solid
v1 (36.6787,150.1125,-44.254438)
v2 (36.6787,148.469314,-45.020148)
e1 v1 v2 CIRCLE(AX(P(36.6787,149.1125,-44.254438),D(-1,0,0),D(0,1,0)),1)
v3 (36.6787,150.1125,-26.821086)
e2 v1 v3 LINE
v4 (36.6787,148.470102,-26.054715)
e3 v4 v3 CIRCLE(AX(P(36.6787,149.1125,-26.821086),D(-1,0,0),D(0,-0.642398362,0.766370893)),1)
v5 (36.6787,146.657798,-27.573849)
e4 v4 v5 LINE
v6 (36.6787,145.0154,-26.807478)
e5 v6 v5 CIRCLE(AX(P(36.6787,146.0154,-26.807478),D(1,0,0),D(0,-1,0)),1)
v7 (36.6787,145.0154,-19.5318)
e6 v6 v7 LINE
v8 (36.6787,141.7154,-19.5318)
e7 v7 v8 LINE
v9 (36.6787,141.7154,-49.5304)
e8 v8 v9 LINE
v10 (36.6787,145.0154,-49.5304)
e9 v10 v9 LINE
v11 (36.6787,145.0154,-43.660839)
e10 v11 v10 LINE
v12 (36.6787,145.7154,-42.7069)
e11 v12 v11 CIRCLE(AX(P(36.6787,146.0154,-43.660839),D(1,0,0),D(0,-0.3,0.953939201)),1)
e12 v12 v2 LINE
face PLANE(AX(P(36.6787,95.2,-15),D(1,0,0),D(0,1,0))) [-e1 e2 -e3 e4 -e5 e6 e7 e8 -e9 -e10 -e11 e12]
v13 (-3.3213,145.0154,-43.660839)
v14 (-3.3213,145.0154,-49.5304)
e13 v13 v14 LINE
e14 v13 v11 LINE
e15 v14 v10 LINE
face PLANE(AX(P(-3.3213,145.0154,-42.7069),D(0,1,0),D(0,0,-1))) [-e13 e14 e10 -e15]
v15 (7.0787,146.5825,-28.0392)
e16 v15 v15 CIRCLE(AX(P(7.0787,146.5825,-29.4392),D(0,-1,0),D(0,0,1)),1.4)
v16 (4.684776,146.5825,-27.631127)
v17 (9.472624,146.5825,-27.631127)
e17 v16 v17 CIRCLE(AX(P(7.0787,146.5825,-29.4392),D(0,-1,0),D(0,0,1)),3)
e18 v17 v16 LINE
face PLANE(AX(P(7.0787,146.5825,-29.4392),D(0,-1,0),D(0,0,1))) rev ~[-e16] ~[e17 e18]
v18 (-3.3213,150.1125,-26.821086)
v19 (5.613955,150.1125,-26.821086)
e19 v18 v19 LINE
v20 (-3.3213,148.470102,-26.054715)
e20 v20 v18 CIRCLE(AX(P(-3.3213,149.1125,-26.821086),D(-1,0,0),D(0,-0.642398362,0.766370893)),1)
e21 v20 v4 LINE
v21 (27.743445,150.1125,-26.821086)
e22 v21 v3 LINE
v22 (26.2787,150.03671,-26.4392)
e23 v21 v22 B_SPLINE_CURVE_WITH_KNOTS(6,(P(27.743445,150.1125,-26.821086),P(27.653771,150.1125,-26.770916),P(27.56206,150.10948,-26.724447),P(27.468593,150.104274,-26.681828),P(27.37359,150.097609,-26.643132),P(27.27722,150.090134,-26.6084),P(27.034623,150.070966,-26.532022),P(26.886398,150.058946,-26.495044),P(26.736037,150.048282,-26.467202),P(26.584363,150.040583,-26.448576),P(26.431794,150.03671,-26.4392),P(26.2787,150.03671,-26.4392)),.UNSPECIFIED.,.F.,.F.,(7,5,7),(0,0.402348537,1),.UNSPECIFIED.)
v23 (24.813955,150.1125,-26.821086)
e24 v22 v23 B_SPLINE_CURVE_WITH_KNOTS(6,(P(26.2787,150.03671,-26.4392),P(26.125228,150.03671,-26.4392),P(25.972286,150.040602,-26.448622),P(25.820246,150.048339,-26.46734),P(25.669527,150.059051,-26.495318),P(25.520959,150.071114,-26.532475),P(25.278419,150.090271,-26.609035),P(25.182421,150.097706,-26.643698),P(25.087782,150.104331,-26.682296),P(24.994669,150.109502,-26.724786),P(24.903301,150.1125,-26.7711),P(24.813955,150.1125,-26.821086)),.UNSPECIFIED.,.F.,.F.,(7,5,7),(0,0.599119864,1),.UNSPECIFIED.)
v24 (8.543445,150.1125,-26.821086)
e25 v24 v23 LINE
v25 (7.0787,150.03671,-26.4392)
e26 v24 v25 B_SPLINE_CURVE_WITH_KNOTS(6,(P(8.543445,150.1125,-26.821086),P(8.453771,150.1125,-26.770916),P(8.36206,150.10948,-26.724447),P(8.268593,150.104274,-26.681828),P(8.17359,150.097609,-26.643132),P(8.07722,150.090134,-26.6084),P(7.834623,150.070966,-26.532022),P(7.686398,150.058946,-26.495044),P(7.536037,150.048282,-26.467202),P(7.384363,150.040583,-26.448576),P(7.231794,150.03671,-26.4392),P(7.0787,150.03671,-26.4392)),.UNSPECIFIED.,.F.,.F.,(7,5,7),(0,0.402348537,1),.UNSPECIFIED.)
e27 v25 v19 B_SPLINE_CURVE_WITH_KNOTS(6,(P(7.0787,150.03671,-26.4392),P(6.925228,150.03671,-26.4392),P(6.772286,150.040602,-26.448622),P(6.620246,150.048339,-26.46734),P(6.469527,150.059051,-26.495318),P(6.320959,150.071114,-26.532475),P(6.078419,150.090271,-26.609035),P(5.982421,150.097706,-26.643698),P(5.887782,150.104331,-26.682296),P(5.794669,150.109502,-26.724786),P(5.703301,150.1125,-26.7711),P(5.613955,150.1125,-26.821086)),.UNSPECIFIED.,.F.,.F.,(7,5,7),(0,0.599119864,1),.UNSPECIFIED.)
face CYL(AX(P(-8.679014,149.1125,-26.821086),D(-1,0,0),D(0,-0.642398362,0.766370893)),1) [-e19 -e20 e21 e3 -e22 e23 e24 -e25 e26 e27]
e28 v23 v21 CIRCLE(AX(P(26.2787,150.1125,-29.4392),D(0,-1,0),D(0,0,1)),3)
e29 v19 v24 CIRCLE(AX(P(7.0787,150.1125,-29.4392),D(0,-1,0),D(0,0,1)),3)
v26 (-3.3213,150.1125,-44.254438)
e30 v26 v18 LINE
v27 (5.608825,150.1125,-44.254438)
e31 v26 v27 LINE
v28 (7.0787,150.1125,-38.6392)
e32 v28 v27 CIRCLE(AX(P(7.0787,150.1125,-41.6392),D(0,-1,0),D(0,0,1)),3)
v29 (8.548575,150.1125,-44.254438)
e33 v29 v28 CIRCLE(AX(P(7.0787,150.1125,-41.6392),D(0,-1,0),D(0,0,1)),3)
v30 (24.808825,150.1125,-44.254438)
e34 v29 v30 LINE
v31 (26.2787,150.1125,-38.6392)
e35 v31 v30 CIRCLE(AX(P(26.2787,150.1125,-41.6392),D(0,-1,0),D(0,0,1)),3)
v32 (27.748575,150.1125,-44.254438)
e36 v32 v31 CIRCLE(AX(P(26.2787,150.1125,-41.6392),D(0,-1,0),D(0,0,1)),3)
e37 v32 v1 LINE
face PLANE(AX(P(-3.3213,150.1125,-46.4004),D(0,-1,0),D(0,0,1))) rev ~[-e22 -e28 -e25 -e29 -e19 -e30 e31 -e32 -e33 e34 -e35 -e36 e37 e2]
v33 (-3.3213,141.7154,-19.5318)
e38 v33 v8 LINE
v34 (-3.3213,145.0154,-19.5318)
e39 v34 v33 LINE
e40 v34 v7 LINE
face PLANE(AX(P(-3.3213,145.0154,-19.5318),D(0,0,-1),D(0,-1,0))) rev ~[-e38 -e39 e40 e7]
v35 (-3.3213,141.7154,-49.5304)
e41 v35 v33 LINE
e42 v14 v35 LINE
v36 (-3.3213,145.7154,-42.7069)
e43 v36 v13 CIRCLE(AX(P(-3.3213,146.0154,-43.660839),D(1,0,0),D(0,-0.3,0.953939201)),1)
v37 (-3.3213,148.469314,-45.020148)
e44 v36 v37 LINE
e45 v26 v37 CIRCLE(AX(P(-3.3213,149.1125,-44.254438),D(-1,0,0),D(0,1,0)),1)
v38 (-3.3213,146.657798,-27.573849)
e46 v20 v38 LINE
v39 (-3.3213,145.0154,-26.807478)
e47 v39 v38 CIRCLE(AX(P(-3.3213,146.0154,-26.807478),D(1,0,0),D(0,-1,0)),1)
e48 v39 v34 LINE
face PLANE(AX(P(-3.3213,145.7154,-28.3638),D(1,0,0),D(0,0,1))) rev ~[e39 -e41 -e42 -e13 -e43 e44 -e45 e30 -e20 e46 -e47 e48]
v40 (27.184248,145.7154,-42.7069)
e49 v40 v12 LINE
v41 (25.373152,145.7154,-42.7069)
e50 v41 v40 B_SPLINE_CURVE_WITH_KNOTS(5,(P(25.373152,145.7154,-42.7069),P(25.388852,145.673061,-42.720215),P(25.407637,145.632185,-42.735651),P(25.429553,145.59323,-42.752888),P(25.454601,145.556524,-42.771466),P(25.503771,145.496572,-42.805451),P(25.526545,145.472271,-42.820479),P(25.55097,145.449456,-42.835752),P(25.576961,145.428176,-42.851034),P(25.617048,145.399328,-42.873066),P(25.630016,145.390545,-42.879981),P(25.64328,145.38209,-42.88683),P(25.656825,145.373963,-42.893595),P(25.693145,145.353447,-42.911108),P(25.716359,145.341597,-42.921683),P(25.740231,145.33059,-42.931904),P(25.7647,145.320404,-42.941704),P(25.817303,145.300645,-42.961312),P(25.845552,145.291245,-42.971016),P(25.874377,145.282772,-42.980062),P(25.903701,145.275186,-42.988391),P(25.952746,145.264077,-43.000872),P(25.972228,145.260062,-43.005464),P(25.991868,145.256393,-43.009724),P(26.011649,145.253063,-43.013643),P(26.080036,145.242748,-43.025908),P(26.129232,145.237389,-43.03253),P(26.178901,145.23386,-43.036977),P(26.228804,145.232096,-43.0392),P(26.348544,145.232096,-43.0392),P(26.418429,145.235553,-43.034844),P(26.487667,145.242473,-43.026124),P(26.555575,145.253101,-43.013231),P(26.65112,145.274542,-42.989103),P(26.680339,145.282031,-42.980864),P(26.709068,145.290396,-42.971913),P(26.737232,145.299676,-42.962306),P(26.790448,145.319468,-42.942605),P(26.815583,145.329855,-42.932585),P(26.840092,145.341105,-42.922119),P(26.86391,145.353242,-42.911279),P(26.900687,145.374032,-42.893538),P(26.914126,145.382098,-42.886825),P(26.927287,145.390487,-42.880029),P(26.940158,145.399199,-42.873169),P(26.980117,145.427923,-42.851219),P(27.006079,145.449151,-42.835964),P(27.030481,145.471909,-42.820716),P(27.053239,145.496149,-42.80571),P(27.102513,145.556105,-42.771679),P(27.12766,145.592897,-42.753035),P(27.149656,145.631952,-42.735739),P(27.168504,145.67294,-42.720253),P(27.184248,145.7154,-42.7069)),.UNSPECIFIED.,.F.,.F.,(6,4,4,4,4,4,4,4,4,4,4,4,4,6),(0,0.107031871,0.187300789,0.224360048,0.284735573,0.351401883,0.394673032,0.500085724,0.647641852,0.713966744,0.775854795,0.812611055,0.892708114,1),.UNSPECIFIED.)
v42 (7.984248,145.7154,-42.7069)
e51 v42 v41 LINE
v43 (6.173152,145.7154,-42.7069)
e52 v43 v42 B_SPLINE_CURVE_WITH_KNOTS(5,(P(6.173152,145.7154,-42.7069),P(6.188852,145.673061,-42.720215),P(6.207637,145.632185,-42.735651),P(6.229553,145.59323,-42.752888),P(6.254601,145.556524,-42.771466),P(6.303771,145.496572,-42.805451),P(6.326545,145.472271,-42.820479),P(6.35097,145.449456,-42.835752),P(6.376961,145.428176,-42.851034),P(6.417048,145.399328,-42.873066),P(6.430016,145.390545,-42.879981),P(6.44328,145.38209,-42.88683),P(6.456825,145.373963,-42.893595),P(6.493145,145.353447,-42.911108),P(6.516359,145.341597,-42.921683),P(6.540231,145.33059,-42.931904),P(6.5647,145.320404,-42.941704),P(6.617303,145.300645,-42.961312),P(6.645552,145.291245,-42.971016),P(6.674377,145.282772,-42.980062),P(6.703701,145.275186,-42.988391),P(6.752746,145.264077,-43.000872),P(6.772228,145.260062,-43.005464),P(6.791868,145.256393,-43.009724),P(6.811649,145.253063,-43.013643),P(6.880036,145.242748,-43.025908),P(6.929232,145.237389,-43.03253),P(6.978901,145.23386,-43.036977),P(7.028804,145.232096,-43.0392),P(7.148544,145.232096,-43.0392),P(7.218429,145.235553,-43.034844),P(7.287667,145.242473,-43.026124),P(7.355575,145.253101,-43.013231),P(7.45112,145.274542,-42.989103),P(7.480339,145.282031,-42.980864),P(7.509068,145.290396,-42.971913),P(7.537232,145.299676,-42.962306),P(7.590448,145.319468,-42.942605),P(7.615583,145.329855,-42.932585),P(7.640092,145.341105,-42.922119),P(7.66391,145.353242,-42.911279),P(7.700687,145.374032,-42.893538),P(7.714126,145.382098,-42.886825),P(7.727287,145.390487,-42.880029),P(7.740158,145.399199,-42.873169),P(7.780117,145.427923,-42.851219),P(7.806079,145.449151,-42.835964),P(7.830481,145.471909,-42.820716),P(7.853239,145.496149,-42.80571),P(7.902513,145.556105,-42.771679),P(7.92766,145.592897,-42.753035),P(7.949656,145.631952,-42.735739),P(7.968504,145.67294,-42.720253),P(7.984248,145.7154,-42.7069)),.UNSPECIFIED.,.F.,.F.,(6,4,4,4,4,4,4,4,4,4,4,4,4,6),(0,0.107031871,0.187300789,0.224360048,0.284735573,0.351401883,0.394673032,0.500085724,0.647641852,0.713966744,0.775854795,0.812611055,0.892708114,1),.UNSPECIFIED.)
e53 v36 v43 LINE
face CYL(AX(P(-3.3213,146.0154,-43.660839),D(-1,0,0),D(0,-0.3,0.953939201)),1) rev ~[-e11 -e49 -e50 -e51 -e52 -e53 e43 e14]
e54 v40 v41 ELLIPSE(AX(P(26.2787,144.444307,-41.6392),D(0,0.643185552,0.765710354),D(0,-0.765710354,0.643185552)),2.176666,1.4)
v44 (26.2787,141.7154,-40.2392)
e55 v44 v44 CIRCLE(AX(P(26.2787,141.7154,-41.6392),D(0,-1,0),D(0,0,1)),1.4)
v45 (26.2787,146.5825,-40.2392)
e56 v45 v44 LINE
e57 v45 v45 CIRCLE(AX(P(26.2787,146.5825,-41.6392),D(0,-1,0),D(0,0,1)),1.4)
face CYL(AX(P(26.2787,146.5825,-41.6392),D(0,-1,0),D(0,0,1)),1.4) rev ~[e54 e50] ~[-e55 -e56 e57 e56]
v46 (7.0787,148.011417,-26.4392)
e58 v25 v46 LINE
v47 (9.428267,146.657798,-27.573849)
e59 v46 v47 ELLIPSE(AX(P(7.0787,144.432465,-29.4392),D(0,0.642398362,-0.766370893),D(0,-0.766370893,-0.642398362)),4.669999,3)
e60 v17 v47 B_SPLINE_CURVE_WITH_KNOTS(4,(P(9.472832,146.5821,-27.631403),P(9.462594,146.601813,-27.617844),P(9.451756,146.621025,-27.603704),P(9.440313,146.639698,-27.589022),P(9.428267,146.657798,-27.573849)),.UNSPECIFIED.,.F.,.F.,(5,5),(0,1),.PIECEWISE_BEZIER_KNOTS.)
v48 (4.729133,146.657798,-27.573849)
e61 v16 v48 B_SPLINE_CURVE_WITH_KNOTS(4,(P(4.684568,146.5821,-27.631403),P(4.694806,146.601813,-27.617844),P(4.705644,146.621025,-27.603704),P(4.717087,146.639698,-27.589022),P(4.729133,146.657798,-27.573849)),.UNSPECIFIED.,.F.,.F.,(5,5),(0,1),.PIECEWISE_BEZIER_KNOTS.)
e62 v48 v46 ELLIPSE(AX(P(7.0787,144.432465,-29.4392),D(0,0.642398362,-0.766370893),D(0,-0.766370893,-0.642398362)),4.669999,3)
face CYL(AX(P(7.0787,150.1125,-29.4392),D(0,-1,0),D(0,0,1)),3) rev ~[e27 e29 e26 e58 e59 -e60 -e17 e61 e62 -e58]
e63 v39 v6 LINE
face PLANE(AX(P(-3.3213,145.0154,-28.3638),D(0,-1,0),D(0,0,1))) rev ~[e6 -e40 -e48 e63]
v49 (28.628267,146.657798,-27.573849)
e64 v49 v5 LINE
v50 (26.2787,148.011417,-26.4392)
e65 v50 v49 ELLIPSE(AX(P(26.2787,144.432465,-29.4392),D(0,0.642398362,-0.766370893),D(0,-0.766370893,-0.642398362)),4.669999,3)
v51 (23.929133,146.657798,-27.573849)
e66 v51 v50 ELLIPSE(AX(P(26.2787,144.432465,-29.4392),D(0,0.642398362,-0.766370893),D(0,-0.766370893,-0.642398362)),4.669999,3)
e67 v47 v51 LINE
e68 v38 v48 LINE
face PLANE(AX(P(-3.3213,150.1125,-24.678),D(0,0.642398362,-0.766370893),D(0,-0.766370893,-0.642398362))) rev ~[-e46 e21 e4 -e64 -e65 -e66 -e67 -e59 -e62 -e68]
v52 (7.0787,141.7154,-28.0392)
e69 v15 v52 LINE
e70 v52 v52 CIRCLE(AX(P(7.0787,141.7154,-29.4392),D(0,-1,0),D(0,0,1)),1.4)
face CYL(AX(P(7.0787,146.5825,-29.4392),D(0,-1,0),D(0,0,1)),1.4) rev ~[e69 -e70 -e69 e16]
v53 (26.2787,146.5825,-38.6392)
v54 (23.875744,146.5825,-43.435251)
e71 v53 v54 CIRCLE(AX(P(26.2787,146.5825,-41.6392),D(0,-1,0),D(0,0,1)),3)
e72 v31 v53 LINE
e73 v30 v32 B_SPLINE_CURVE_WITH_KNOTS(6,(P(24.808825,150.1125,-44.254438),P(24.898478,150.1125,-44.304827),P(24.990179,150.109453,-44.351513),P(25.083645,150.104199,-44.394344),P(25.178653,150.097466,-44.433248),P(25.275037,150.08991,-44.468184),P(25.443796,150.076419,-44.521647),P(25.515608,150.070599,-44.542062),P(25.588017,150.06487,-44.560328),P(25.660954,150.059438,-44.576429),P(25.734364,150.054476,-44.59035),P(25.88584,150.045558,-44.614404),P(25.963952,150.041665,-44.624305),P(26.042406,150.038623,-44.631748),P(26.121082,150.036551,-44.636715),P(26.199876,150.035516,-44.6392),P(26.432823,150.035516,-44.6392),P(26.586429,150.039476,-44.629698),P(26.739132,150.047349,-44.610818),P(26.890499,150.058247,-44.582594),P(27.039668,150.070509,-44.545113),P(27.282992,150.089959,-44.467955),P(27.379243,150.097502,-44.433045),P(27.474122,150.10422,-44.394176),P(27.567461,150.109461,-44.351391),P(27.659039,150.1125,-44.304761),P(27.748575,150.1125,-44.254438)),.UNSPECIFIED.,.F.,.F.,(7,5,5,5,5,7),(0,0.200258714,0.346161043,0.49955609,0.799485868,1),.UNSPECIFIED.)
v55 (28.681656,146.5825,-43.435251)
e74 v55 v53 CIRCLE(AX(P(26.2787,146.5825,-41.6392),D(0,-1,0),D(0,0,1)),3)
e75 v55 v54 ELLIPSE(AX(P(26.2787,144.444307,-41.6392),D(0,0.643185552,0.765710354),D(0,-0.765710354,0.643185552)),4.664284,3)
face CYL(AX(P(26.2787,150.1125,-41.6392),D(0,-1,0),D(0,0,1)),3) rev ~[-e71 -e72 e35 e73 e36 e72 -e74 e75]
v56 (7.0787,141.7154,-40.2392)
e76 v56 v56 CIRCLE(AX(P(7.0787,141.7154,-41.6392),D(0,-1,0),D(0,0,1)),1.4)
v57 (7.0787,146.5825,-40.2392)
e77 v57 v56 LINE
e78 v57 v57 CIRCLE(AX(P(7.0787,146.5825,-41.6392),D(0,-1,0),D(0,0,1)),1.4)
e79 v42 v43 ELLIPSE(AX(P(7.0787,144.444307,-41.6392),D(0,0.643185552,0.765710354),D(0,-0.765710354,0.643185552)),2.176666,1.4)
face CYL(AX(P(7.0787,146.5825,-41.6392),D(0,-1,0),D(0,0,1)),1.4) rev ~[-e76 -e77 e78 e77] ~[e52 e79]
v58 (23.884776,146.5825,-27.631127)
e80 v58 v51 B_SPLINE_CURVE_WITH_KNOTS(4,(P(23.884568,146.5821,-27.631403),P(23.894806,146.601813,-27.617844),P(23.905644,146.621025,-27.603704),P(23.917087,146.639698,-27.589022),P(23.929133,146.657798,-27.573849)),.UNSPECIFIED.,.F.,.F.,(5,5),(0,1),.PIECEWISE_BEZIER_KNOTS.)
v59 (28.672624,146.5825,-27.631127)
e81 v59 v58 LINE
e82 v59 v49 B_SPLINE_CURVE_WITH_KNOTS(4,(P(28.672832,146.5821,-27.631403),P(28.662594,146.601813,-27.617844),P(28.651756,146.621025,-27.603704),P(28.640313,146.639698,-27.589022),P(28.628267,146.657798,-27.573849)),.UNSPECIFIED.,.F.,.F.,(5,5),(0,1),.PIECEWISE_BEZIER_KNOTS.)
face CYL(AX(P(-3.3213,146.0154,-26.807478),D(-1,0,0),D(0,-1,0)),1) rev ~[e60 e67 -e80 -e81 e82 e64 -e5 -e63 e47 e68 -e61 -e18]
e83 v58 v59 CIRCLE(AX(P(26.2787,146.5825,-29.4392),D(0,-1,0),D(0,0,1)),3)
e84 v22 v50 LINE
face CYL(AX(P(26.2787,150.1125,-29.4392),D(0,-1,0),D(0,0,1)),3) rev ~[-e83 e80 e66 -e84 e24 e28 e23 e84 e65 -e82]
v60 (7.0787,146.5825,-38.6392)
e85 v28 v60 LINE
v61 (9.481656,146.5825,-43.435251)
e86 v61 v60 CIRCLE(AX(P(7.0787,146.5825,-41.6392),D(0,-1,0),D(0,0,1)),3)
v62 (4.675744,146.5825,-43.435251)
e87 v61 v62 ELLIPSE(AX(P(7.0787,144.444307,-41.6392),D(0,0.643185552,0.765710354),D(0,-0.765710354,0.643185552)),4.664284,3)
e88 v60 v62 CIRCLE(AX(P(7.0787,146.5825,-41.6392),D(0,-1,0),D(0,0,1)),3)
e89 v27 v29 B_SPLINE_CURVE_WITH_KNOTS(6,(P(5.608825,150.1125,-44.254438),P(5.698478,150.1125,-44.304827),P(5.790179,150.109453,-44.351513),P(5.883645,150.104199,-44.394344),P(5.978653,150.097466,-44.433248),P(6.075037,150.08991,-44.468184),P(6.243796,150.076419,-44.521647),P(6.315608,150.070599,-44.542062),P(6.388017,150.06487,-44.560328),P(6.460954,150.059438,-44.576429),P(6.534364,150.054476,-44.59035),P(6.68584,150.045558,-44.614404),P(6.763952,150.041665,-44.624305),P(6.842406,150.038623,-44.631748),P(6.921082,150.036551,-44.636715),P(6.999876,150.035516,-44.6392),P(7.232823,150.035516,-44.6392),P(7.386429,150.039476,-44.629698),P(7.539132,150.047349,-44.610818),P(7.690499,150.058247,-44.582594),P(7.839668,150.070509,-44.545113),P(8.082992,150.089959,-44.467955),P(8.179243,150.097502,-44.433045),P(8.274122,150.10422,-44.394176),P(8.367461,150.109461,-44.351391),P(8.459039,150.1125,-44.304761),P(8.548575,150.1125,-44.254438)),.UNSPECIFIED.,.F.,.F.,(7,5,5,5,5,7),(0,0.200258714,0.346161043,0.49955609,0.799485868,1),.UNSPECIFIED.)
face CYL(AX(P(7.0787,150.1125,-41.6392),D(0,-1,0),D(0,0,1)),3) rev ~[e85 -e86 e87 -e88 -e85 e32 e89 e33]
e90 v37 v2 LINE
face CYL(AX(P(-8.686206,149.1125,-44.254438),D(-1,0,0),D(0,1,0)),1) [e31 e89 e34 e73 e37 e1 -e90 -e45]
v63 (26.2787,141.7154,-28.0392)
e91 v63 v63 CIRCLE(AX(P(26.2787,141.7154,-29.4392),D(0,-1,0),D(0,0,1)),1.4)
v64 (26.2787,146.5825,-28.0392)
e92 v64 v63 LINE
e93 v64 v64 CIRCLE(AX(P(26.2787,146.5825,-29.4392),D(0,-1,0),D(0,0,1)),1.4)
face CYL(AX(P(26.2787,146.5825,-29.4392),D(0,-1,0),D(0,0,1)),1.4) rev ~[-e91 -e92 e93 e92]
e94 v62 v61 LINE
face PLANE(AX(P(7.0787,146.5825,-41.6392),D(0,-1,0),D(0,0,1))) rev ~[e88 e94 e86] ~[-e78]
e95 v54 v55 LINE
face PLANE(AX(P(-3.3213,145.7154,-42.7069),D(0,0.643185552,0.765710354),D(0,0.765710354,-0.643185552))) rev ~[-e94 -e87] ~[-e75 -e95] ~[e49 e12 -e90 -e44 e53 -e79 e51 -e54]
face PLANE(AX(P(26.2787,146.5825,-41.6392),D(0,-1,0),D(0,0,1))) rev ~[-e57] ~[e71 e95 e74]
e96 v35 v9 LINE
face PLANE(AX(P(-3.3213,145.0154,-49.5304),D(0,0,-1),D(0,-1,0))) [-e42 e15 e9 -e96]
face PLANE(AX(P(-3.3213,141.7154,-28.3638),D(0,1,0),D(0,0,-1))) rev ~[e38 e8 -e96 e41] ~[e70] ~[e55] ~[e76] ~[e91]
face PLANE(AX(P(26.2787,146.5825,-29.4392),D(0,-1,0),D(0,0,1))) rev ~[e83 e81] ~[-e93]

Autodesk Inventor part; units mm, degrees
ref_plane "YZ Plane" through (0, 0, 0) normal (1, 0, 0) x (0, 1, 0)
ref_plane "XZ Plane" through (0, 0, 0) normal (0, 1, 0) x (-1, 0, 0)
ref_plane "XY Plane" through (0, 0, 0) normal (0, 0, 1) x (1, 0, 0)
ref_plane "Arbeitsebene9" through (-58.9003, 150.915, -19.5294) normal (1, 0, 0) x (0, 1, 0.0002861)
ref_plane "Arbeitsebene10" through (-3.3213, 95.2, -15) normal (1, 0, 0) x (0, 1, 0)
sketch "Skizze8" plane through (-3.3213, 95.2, -15) normal (1, 0, 0) x (0, 1, 0)
  line L0 (51.0327, -12.5388) -> (54.3913, -9.7235)
  line L1 (55.2125, -10.1069) -> (55.2018, -30.9624)
  line L2 (54.3802, -31.345) -> (51.0244, -28.5262)
  line L3 (50.2028, -28.9088) -> (50.1999, -34.5321)
  line L4 (50.2154, -4.5321) -> (50.2115, -12.1553)
  line L5 (50.2154, -13.2238) -> (55.2125, -9.0351)
  line L6 (55.2125, -9.0351) -> (55.2125, -32.0442)
  line L7 (55.2125, -32.0442) -> (50.2154, -27.8467)
  line L8 (50.2154, -13.2238) -> (50.2154, -27.8467)
  line L9 (54.9125, -9.678) -> (50.5154, -13.3638)
  line L10 (50.5154, -13.3638) -> (50.5154, -27.7069)
  line L11 (50.5154, -27.7069) -> (54.9125, -31.4004)
  line L12 (54.9125, -31.4004) -> (54.9125, -9.678)
  line L13 (50.5154, -13.3638) -> (46.5154, -13.3638)
  line L14 (50.5154, -13.3638) -> (54.5154, -13.3638) construction
  line L15 (46.5154, -13.3638) -> (46.5154, -27.7069)
  line L16 (46.5154, -27.7069) -> (50.5154, -27.7069)
  line L17 (67.5498, -4.541) -> (50.2154, -4.5321)
  line L18 (61.046, -34.5285) -> (50.2065, -34.5303)
  line L19 (46.5154, -13.3638) -> (49.8154, -13.3638)
  line L20 (49.8154, -13.3638) -> (49.8154, -4.5318)
  line L21 (49.8154, -4.5318) -> (46.5154, -4.5318)
  line L22 (46.5154, -4.5318) -> (46.5154, -13.3638)
  line L23 (46.5154, -27.7069) -> (49.8154, -27.7069)
  line L24 (49.8154, -27.7069) -> (49.8154, -34.5304)
  line L25 (49.8154, -34.5304) -> (46.5154, -34.5304)
  line L26 (46.5154, -34.5304) -> (46.5154, -27.7069)
  point P0 (-95.2, 15)
  point P1 (50.2154, -27.7069)
  point P2 (54.3913, -9.7235)
  point P3 (50.2154, -13.3638)
  dimension "d62" = 0.3
  dimension "d63" = 4
  dimension "d64" = 180
  dimension "d65" = 0.4
extrude "Extrusion5" add sketch "Skizze8" along normal blind 40 contours L13 L10 L16 L8 | L8 L16 L15 L13 | L9 L12 L11 L10 | L13 L22 L21 L20 | L24 L25 L26 L16
sketch "Skizze9" plane through (-3.3213, 150.1125, -5.7071) normal (0, 1, 0) x (1, 0, 0)
  line L0 (10.4, 23.7321) -> (29.6, 23.7321)
  line L1 (29.6, 23.7321) -> (29.6, 35.9321)
  line L2 (29.6, 35.9321) -> (10.4, 35.9321)
  line L3 (10.4, 35.9321) -> (10.4, 23.7321)
  line L4 (10.4, 23.7321) -> (29.6, 35.9321) construction
  line L5 (29.6, 23.7321) -> (10.4, 35.9321) construction
  line L6 (0, 40.6933) -> (0, 18.9709) projected
  line L7 (0, 18.9709) -> (40, 18.9709) projected
  line L8 (40, 40.6933) -> (40, 18.9709) projected
  line L9 (0, 40.6933) -> (40, 40.6933) projected
  point P0 (3.3213, -5.7071)
  point P1 (20, 29.8321)
  dimension "d52" = 19.2
  dimension "d53" = 12.2
fillet "Rundung3" radius 1 5 edges at (16.6787, 150.1125, -24.678) (16.6787, 150.1125, -46.4004) (16.6787, 145.0154, -42.7069) (16.6787, 145.7154, -28.3638) (16.6787, 145.0154, -28.3638)
hole "Bohrung4" at (7.0787, 150.1125, -29.4392) at (26.2787, 150.1125, -29.4392) at (26.2787, 150.1125, -41.6392) at (7.0787, 150.1125, -41.6392) direction (0, -1, 0) diameter 2.8 end through all counterbore diameter 6 counterbore depth 3.53
ref_plane "Arbeitsebene11" through (-3.3213, 141.7154, -34.5311) normal (0, 0, 1) x (1, 0, 0)
ref_plane "Arbeitsebene12" through (16.6787, 95.2, -15) normal (1, 0, 0) x (0, 0, -1)
properties part number "40_Cube_Z-only_illuminationarm_base-wifiholder_slidermount"
